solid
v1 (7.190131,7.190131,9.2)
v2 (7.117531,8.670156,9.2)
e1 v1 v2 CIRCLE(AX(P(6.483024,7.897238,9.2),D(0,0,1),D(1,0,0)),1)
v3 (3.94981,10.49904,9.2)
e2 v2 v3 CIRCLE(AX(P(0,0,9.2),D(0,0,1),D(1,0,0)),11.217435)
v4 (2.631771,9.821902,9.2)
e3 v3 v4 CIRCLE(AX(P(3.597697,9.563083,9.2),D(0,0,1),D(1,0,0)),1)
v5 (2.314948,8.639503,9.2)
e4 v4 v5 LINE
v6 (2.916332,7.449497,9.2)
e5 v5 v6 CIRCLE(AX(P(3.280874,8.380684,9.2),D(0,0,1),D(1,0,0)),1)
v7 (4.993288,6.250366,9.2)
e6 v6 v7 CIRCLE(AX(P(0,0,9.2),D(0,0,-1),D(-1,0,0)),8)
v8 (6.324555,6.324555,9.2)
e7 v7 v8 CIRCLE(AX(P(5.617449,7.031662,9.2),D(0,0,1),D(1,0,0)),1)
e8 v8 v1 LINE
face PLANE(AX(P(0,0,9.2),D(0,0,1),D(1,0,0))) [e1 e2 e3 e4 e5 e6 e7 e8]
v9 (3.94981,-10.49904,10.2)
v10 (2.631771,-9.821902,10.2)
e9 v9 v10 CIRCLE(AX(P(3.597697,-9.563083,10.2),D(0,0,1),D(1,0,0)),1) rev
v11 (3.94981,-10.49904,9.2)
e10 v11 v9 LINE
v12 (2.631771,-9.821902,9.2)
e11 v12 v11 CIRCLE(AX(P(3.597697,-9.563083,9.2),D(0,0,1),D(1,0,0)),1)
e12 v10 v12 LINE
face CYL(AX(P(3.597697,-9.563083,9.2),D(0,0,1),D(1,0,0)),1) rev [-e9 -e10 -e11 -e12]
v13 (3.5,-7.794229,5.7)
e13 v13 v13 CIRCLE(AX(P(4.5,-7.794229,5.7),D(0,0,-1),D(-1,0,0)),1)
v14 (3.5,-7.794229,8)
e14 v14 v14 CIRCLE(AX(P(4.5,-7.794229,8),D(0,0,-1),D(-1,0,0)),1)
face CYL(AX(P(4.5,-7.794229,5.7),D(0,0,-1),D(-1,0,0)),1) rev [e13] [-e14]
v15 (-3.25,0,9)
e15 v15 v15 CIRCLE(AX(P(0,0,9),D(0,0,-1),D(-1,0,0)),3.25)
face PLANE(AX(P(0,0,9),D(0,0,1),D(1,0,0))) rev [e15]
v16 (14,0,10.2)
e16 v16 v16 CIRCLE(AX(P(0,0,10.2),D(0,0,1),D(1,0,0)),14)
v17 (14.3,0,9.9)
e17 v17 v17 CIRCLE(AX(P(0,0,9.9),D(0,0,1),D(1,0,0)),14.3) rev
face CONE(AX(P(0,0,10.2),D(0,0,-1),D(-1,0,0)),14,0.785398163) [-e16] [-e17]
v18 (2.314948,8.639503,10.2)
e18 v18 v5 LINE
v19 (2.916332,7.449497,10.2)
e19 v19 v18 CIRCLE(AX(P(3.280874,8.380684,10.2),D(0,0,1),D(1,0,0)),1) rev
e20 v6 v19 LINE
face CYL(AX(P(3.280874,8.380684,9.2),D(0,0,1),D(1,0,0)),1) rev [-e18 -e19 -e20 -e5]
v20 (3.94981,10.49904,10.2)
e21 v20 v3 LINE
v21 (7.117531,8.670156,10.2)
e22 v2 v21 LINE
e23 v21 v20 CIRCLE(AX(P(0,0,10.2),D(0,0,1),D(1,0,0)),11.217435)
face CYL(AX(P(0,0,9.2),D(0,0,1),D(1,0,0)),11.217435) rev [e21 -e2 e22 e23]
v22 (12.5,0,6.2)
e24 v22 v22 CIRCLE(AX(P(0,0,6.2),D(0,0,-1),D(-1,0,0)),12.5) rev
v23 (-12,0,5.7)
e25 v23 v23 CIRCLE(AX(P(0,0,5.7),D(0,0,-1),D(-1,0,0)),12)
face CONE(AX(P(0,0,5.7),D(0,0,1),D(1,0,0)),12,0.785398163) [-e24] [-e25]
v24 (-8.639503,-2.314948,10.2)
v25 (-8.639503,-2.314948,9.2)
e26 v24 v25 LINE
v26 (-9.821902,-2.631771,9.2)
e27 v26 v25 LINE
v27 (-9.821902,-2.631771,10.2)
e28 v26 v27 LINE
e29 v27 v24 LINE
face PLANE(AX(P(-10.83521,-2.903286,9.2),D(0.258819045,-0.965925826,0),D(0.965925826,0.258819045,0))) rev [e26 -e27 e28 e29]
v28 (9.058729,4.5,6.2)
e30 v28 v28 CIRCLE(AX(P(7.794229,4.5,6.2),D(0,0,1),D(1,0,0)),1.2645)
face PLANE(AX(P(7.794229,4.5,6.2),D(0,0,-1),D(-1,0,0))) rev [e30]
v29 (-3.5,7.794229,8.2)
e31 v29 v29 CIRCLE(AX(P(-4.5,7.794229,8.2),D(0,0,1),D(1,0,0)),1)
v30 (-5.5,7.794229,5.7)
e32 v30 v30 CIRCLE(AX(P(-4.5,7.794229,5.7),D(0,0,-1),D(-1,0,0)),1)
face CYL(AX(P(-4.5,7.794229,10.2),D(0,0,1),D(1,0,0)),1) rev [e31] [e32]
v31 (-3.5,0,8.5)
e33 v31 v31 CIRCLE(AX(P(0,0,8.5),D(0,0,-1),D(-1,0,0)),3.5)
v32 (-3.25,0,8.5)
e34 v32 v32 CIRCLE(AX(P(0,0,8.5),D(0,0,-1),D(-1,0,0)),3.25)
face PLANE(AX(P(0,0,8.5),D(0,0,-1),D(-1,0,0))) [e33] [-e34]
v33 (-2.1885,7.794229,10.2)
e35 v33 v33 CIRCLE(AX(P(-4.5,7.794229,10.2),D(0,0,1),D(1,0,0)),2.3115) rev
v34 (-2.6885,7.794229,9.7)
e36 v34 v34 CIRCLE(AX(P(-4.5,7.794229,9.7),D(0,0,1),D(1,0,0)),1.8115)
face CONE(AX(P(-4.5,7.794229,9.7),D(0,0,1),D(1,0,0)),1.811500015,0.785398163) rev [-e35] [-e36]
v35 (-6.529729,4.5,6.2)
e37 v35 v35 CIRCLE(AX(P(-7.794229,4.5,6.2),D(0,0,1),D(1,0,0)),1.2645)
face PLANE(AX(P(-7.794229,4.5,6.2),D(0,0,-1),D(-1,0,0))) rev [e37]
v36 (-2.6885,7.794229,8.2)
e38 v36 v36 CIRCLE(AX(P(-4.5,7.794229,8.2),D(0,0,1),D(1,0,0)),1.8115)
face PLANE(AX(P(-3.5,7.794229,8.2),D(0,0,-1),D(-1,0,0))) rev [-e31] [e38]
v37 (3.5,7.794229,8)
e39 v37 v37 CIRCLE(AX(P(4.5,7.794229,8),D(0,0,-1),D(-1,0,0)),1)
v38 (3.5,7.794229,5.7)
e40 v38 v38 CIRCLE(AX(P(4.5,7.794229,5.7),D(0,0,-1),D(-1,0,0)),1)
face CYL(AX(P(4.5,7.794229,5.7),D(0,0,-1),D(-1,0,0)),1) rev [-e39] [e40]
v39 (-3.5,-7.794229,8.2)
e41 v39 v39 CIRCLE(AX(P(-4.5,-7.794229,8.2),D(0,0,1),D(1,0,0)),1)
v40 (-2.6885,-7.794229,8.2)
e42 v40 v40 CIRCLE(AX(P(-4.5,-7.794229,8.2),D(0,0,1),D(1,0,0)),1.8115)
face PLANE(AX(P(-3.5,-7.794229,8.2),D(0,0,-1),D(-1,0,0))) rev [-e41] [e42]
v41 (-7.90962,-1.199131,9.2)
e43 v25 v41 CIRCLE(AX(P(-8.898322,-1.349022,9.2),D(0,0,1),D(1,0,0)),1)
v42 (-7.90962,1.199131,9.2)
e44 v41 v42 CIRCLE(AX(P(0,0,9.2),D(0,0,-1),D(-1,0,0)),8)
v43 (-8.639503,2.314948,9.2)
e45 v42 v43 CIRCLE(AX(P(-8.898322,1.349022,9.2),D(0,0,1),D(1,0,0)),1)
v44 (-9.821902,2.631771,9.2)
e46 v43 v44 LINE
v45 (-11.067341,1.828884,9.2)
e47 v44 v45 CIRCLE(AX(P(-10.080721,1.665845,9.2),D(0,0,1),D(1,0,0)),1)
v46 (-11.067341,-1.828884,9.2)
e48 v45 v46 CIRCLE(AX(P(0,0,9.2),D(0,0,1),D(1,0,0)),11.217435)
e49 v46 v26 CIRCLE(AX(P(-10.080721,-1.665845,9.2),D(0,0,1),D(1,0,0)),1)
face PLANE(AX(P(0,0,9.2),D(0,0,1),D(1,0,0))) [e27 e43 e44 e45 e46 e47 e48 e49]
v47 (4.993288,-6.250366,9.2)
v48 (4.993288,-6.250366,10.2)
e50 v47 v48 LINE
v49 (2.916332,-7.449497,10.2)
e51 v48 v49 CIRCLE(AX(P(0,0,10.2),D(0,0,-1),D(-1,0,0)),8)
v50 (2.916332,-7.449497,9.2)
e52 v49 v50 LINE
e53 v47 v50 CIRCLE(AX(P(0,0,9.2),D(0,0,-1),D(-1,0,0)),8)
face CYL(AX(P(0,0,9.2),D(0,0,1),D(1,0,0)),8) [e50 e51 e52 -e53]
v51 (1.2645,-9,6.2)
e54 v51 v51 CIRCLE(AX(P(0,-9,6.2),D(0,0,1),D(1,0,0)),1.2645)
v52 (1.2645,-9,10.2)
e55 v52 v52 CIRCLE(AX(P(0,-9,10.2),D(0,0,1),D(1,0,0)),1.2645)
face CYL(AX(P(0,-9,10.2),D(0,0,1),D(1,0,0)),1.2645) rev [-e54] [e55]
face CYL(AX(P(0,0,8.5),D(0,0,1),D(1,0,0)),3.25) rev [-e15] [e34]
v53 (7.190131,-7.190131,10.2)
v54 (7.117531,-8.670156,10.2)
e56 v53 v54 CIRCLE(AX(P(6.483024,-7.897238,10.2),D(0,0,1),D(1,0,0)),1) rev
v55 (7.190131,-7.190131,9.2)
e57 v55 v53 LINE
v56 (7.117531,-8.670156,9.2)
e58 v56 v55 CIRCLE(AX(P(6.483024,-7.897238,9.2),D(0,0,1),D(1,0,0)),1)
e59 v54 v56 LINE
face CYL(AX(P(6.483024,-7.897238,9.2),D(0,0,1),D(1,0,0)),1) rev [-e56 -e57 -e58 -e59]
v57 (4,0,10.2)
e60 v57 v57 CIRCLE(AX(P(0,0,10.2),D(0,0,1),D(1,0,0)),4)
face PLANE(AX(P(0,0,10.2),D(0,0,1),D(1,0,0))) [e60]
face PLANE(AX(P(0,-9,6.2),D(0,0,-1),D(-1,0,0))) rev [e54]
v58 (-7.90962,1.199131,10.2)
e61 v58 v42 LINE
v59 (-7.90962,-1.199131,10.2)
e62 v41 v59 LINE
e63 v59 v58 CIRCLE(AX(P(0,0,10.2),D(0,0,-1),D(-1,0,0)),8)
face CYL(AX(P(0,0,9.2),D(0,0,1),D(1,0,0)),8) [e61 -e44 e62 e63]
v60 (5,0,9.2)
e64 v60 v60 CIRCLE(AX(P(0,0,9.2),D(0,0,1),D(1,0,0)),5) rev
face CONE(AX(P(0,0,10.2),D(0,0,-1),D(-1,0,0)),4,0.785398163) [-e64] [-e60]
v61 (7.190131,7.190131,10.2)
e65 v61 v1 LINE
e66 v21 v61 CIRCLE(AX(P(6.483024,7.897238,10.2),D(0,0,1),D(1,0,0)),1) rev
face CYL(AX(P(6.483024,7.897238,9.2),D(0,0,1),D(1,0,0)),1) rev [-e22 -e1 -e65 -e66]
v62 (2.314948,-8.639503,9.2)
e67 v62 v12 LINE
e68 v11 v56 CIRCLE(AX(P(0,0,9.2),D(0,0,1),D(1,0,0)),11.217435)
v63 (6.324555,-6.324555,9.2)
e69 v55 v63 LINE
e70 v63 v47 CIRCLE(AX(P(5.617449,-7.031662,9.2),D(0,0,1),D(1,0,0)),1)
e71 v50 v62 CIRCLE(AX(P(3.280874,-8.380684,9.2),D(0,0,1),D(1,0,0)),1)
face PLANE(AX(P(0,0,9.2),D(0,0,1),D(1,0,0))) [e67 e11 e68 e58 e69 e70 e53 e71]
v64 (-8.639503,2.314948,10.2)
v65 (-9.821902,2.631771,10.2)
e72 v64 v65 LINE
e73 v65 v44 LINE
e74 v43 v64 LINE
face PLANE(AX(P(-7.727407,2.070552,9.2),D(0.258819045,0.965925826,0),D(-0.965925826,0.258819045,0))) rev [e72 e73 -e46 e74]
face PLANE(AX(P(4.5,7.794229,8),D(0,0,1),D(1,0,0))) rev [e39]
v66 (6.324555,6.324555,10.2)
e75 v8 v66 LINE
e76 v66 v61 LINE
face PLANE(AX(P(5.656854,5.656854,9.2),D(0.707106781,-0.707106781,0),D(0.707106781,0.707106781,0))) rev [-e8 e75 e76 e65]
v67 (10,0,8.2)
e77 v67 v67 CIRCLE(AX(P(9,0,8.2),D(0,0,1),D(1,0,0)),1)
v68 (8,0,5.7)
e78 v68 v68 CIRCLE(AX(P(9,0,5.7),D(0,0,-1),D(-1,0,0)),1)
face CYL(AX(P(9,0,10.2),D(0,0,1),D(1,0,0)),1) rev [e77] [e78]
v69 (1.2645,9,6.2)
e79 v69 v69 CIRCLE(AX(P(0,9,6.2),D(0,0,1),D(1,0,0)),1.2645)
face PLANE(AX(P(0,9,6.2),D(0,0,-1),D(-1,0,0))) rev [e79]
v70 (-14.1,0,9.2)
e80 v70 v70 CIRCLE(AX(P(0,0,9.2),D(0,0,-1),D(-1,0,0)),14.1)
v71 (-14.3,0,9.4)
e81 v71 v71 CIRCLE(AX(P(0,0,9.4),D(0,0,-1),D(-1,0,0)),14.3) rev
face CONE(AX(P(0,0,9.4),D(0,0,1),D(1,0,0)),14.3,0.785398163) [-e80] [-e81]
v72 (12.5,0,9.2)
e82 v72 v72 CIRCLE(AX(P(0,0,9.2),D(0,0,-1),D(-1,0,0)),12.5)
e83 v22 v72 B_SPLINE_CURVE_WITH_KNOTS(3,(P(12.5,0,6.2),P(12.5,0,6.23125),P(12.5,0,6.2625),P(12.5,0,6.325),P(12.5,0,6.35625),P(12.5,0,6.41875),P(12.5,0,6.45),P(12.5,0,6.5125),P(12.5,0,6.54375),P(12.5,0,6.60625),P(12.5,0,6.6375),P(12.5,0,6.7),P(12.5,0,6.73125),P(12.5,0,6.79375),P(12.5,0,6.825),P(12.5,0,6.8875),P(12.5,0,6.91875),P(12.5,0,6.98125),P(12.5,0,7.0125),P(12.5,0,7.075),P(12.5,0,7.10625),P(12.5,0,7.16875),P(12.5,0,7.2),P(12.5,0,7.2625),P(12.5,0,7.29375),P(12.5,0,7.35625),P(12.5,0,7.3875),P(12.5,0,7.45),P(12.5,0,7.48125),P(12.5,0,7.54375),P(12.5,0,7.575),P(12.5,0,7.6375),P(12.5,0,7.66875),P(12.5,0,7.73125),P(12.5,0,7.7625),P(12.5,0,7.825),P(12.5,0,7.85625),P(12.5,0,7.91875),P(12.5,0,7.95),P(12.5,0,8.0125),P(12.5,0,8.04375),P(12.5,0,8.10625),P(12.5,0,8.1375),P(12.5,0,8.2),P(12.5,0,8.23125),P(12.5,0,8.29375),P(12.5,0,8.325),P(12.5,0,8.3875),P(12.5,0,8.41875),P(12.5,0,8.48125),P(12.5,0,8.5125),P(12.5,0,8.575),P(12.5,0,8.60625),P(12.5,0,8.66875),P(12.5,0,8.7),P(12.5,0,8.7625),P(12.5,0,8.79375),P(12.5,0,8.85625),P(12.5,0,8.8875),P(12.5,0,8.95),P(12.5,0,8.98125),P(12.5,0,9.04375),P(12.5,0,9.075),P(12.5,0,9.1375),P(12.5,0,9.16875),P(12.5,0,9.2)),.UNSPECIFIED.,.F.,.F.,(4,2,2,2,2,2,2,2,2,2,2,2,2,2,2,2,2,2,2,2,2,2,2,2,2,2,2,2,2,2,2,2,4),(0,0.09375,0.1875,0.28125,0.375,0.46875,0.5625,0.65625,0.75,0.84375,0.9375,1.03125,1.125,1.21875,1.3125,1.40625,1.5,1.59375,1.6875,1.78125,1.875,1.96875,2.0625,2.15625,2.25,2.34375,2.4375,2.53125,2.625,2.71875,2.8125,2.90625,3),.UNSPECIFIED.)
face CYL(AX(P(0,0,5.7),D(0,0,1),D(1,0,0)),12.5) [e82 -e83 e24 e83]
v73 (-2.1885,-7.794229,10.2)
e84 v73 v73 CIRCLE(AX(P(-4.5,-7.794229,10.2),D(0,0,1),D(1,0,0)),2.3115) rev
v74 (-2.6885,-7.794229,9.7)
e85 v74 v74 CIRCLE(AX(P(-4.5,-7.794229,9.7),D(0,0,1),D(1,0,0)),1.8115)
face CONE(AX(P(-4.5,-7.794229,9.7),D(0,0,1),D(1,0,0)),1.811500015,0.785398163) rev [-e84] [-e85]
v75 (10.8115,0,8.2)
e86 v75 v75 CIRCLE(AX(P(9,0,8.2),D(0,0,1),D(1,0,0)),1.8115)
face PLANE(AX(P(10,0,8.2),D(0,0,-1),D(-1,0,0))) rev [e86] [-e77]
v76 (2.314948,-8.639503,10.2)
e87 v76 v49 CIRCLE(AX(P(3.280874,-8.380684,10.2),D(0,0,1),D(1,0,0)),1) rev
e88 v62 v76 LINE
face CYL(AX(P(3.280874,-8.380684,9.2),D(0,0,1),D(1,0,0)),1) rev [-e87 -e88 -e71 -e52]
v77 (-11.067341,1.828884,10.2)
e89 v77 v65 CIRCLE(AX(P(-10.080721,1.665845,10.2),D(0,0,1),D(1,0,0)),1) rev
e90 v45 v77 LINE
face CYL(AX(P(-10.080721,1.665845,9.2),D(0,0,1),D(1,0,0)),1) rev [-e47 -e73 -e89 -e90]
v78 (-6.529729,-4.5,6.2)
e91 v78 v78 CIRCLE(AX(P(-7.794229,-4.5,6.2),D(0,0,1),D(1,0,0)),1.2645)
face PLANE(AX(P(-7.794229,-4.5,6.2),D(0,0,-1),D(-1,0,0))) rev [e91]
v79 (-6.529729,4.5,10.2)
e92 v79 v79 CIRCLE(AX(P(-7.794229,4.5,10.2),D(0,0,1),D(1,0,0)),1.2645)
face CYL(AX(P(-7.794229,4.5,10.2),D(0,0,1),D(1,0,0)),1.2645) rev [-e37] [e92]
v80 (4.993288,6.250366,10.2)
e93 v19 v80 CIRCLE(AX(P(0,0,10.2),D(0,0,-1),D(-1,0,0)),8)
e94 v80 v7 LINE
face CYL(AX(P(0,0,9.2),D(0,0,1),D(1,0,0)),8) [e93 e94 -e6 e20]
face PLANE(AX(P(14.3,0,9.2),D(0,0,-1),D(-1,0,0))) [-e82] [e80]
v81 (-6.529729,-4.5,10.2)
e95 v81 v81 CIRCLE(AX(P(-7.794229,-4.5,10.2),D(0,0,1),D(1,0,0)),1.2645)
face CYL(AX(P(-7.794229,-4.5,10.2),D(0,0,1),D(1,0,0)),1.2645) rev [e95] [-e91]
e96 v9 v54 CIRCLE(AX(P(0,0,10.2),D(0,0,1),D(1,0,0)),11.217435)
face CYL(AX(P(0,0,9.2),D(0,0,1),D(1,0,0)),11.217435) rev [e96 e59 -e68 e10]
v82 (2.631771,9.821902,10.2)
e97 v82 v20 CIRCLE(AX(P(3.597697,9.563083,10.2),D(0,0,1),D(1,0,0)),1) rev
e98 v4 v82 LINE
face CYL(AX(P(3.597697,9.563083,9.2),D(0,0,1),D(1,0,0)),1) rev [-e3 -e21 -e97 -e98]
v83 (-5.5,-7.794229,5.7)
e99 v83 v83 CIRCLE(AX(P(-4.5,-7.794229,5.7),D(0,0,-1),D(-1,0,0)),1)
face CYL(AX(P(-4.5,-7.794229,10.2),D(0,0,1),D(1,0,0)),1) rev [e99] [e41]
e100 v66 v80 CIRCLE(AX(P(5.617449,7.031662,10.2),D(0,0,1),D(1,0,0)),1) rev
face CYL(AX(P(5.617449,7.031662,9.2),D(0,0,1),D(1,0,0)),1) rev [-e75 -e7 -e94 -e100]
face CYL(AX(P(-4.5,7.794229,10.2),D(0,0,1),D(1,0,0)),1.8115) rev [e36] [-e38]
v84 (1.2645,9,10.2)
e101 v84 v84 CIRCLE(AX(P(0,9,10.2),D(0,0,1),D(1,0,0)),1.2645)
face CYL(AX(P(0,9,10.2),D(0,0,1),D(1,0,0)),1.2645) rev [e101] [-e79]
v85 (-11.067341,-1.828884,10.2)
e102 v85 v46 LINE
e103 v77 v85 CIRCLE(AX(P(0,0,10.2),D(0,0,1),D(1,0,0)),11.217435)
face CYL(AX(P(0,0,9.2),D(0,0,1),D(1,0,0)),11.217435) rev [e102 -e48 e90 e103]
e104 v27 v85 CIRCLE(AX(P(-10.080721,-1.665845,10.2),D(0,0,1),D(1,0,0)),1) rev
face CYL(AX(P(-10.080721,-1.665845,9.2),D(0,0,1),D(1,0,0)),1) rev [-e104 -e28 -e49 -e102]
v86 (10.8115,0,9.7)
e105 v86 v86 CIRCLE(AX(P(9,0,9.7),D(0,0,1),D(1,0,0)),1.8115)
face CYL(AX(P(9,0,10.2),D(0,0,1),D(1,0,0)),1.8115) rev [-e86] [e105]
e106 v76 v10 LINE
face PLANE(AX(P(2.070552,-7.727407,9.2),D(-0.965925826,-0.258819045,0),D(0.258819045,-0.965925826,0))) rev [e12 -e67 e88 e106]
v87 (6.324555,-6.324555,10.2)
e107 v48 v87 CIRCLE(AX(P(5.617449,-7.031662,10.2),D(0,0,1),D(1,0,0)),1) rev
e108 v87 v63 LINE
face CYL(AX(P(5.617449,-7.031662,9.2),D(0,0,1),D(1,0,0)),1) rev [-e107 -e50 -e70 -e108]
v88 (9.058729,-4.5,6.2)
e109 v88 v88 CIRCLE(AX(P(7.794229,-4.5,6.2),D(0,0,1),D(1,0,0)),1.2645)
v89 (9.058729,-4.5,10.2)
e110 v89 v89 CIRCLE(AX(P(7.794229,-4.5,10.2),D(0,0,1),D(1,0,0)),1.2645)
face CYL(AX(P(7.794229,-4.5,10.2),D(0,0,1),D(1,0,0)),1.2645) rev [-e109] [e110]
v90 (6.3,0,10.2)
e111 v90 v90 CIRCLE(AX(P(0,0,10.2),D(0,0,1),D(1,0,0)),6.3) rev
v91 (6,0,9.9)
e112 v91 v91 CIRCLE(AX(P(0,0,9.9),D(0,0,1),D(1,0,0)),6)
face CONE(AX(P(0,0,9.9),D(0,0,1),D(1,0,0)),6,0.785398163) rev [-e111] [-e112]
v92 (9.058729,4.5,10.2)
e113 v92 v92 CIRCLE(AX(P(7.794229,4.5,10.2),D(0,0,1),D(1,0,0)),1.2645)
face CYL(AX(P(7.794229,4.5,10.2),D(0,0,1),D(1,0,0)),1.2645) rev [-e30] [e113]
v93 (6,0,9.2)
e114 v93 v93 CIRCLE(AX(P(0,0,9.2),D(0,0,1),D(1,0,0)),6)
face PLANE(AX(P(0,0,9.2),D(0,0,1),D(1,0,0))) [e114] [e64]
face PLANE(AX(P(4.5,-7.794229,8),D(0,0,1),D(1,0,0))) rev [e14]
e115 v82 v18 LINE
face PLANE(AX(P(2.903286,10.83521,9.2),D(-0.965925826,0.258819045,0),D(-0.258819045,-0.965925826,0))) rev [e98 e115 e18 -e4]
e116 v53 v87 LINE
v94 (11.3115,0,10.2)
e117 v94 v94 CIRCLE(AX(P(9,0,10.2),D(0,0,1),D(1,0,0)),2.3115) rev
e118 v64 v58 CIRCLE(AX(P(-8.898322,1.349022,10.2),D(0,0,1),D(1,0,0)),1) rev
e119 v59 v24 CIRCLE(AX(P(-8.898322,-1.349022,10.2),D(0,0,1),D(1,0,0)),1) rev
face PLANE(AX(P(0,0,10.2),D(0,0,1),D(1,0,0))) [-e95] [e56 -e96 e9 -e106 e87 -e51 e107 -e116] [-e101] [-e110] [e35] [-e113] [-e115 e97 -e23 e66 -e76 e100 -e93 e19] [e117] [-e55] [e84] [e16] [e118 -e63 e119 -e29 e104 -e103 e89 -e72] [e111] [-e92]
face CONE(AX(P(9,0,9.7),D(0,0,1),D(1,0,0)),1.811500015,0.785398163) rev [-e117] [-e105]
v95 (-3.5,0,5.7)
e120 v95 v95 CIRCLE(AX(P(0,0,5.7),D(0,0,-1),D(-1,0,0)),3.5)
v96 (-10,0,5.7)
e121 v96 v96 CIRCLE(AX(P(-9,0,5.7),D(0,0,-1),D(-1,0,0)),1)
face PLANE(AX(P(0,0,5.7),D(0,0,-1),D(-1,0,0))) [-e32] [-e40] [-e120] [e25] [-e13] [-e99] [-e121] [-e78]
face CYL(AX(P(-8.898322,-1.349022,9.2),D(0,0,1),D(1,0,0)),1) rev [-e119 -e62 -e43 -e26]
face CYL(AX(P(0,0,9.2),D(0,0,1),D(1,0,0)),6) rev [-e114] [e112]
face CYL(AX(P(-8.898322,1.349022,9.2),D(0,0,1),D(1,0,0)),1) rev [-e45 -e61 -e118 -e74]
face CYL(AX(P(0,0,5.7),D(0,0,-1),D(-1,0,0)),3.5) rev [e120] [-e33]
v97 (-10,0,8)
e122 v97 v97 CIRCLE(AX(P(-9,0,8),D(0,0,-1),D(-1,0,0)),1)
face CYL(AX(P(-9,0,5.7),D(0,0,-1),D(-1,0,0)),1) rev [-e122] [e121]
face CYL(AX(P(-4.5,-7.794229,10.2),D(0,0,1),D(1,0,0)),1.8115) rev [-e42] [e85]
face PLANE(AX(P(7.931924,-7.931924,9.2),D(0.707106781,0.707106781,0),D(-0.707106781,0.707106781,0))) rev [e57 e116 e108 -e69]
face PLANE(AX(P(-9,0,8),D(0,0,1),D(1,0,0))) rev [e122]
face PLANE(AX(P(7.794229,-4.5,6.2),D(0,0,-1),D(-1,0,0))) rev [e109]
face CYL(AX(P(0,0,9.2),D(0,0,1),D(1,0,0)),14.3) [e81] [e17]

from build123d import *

# Parameters (mm, degrees)
SKETCH1_W                        = 14.3
SKETCH1_H                        = 1
SKETCH2_R                        = 12.5
BOSS_EXTRUDE1_DEPTH              = 3.5
F_7_0_7_DIAMETER_HOLE1_D         = 7
F_7_0_7_DIAMETER_HOLE1_DEPTH     = 3.3
SKETCH17_R                       = 3.5
SKETCH17_R_2                     = 3.25
BOSS_EXTRUDE3_DEPTH              = 0.5
SKETCH18_R                       = 6
CUT_EXTRUDE4_DEPTH               = 1
SKETCH19_R                       = 4
BOSS_EXTRUDE4_DEPTH              = 1
CUT_EXTRUDE1_DEPTH               = 1
CUT_EXTRUDE2_DEPTH               = 1
CUT_EXTRUDE3_DEPTH               = 1
F_2_0_2_DIAMETER_HOLE1_D         = 2
F_2_0_2_DIAMETER_HOLE1_DEPTH     = 2.3
CBORE_FOR_M1_6_SHCS1_D           = 2
CBORE_FOR_M1_6_SHCS1_CBORE_D     = 3.62300003
CBORE_FOR_M1_6_SHCS1_CBORE_DEPTH = 2
M2_CLEARANCE_HOLE1_D             = 2.529
M2_CLEARANCE_HOLE1_DEPTH         = 4
CHAMFER1_SIZE                    = 0.5
CHAMFER2_SIZE                    = 0.3
CHAMFER3_SIZE                    = 0.2
CHAMFER4_SIZE                    = 1
FILLET1_R                        = 1


with BuildPart() as part:
    # Sketch1 → Revolve1 (revolve)
    with BuildSketch(Plane(origin=(0, 0, 0), x_dir=(1, 0, 0), z_dir=(0, 1, 0))):
        with Locations((7.15, -9.7)):
            Rectangle(SKETCH1_W, SKETCH1_H)
    revolve(axis=Axis((0, 0, 9.2), (0, 0, 1)))

    # Sketch2 → Boss-Extrude1 (add)
    with BuildSketch(Plane(origin=(0, 0, 9.2), x_dir=(-1, 0, 0), z_dir=(0, 0, -1))):
        with Locations(Location((0, 0, 0), (0, 0, 180))):
            Circle(SKETCH2_R)
    extrude(amount=BOSS_EXTRUDE1_DEPTH)

    # Ø7.0 (7) Diameter Hole1
    with Locations(Plane(origin=(0, 0, 5.7), x_dir=(1, 0, 0), z_dir=(0, 0, -1))):
        with Locations((0, 0)):
            Hole(F_7_0_7_DIAMETER_HOLE1_D / 2, depth=F_7_0_7_DIAMETER_HOLE1_DEPTH)

    # Sketch17 → Boss-Extrude3 (add)
    with BuildSketch(Plane(origin=(0, 0, 9), x_dir=(-1, 0, 0), z_dir=(0, 0, -1))):
        Circle(SKETCH17_R)
        Circle(SKETCH17_R_2, mode=Mode.SUBTRACT)
    extrude(amount=BOSS_EXTRUDE3_DEPTH)

    # Sketch18 → Cut-Extrude4 (cut)
    with BuildSketch(Plane.XY.offset(10.2)):
        Circle(SKETCH18_R)
    extrude(amount=-CUT_EXTRUDE4_DEPTH, mode=Mode.SUBTRACT)

    # Sketch19 → Boss-Extrude4 (add)
    with BuildSketch(Plane.XY.offset(9.2)):
        Circle(SKETCH19_R)
    extrude(amount=BOSS_EXTRUDE4_DEPTH)

    # Sketch6 → Cut-Extrude1 (cut)
    with BuildSketch(Plane.XY.offset(10.2)):
        with BuildLine():
            Line((2.903285774, 10.835210018), (2.070552392, 7.727406725))
            ThreePointArc((2.070552392, 7.727406725), (4.00000006, 6.928203334), (5.656854334, 5.656854334))
            Line((5.656854334, 5.656854334), (7.931924244, 7.931924244))
            ThreePointArc((7.931924244, 7.931924244), (5.60871742, 9.714583538), (2.903285774, 10.835210018))
        make_face()
    extrude(amount=-CUT_EXTRUDE1_DEPTH, mode=Mode.SUBTRACT)

    # Sketch7 → Cut-Extrude2 (cut)
    with BuildSketch(Plane.XY.offset(10.2)):
        with BuildLine():
            Line((7.931924244, -7.931924244), (5.656854334, -5.656854334))
            ThreePointArc((5.656854334, -5.656854334), (4.00000006, -6.928203334), (2.070552392, -7.727406725))
            Line((2.070552392, -7.727406725), (2.903285774, -10.835210018))
            ThreePointArc((2.903285774, -10.835210018), (5.60871742, -9.714583538), (7.931924244, -7.931924244))
        make_face()
    extrude(amount=-CUT_EXTRUDE2_DEPTH, mode=Mode.SUBTRACT)

    # Sketch8 → Cut-Extrude3 (cut)
    with BuildSketch(Plane.XY.offset(10.2)):
        with BuildLine():
            Line((-10.835210018, -2.903285774), (-7.727406725, -2.070552392))
            ThreePointArc((-7.727406725, -2.070552392), (-8.000000119, 0), (-7.727406725, 2.070552392))
            Line((-7.727406725, 2.070552392), (-10.835210018, 2.903285774))
            ThreePointArc((-10.835210018, 2.903285774), (-11.217434841, 0), (-10.835210018, -2.903285774))
        make_face()
    extrude(amount=-CUT_EXTRUDE3_DEPTH, mode=Mode.SUBTRACT)

    # Ø2.0 (2) Diameter Hole1
    with Locations(Plane(origin=(0, 0, 5.7), x_dir=(-1, 0, 0), z_dir=(0, 0, -1))):
        with Locations((-4.5, 7.794228634), (9, 0), (-4.5, -7.794228634)):
            Hole(F_2_0_2_DIAMETER_HOLE1_D / 2, depth=F_2_0_2_DIAMETER_HOLE1_DEPTH)

    # CBORE for M1.6 SHCS1 (through all)
    with Locations(Plane.XY.offset(10.2)):
        with Locations((-4.5, 7.794228634), (-4.5, -7.794228634), (9, 0)):
            CounterBoreHole(CBORE_FOR_M1_6_SHCS1_D / 2, CBORE_FOR_M1_6_SHCS1_CBORE_D / 2, CBORE_FOR_M1_6_SHCS1_CBORE_DEPTH)

    # M2 Clearance Hole1
    with Locations(Plane.XY.offset(10.2)):
        with Locations((7.794228634, -4.5), (-7.794228634, -4.5), (7.794228634, 4.5), (0, -9), (-7.794228634, 4.5), (0, 9)):
            Hole(M2_CLEARANCE_HOLE1_D / 2, depth=M2_CLEARANCE_HOLE1_DEPTH)

    # Chamfer1
    chamfer1_edges = [part.edges().sort_by_distance(p)[0] for p in [
        (-6.311500015, 7.794228634, 10.2),
        (7.188499985, 0, 10.2),
        (-6.311500015, -7.794228634, 10.2),
        (-12.5, 0, 5.7),
    ]]
    chamfer(chamfer1_edges, length=CHAMFER1_SIZE)

    # Chamfer2
    chamfer2_edges = [part.edges().sort_by_distance(p)[0] for p in [
        (-6, 0, 10.2),
        (-14.3, 0, 10.2),
    ]]
    chamfer(chamfer2_edges, length=CHAMFER2_SIZE)

    # Chamfer3
    chamfer3_edges = [part.edges().sort_by_distance(p)[0] for p in [
        (-14.3, 0, 9.2),
    ]]
    chamfer(chamfer3_edges, length=CHAMFER3_SIZE)

    # Chamfer4
    chamfer4_edges = [part.edges().sort_by_distance(p)[0] for p in [
        (-4, 0, 9.2),
    ]]
    chamfer(chamfer4_edges, length=CHAMFER4_SIZE - 0.0001)  # a hair under: the kernel refuses the full size

    # Fillet1
    fillet1_edges = [part.edges().sort_by_distance(p)[0] for p in [
        (2.903285774, 10.835210018, 9.7),
        (7.931924244, 7.931924244, 9.7),
        (5.656854334, 5.656854334, 9.7),
        (2.070552392, 7.727406725, 9.7),
        (7.931924244, -7.931924244, 9.7),
        (2.903285774, -10.835210018, 9.7),
        (2.070552392, -7.727406725, 9.7),
        (5.656854334, -5.656854334, 9.7),
        (-10.835210018, -2.903285774, 9.7),
        (-10.835210018, 2.903285774, 9.7),
        (-7.727406725, 2.070552392, 9.7),
        (-7.727406725, -2.070552392, 9.7),
    ]]
    fillet(fillet1_edges, radius=FILLET1_R)


solid = part.part
